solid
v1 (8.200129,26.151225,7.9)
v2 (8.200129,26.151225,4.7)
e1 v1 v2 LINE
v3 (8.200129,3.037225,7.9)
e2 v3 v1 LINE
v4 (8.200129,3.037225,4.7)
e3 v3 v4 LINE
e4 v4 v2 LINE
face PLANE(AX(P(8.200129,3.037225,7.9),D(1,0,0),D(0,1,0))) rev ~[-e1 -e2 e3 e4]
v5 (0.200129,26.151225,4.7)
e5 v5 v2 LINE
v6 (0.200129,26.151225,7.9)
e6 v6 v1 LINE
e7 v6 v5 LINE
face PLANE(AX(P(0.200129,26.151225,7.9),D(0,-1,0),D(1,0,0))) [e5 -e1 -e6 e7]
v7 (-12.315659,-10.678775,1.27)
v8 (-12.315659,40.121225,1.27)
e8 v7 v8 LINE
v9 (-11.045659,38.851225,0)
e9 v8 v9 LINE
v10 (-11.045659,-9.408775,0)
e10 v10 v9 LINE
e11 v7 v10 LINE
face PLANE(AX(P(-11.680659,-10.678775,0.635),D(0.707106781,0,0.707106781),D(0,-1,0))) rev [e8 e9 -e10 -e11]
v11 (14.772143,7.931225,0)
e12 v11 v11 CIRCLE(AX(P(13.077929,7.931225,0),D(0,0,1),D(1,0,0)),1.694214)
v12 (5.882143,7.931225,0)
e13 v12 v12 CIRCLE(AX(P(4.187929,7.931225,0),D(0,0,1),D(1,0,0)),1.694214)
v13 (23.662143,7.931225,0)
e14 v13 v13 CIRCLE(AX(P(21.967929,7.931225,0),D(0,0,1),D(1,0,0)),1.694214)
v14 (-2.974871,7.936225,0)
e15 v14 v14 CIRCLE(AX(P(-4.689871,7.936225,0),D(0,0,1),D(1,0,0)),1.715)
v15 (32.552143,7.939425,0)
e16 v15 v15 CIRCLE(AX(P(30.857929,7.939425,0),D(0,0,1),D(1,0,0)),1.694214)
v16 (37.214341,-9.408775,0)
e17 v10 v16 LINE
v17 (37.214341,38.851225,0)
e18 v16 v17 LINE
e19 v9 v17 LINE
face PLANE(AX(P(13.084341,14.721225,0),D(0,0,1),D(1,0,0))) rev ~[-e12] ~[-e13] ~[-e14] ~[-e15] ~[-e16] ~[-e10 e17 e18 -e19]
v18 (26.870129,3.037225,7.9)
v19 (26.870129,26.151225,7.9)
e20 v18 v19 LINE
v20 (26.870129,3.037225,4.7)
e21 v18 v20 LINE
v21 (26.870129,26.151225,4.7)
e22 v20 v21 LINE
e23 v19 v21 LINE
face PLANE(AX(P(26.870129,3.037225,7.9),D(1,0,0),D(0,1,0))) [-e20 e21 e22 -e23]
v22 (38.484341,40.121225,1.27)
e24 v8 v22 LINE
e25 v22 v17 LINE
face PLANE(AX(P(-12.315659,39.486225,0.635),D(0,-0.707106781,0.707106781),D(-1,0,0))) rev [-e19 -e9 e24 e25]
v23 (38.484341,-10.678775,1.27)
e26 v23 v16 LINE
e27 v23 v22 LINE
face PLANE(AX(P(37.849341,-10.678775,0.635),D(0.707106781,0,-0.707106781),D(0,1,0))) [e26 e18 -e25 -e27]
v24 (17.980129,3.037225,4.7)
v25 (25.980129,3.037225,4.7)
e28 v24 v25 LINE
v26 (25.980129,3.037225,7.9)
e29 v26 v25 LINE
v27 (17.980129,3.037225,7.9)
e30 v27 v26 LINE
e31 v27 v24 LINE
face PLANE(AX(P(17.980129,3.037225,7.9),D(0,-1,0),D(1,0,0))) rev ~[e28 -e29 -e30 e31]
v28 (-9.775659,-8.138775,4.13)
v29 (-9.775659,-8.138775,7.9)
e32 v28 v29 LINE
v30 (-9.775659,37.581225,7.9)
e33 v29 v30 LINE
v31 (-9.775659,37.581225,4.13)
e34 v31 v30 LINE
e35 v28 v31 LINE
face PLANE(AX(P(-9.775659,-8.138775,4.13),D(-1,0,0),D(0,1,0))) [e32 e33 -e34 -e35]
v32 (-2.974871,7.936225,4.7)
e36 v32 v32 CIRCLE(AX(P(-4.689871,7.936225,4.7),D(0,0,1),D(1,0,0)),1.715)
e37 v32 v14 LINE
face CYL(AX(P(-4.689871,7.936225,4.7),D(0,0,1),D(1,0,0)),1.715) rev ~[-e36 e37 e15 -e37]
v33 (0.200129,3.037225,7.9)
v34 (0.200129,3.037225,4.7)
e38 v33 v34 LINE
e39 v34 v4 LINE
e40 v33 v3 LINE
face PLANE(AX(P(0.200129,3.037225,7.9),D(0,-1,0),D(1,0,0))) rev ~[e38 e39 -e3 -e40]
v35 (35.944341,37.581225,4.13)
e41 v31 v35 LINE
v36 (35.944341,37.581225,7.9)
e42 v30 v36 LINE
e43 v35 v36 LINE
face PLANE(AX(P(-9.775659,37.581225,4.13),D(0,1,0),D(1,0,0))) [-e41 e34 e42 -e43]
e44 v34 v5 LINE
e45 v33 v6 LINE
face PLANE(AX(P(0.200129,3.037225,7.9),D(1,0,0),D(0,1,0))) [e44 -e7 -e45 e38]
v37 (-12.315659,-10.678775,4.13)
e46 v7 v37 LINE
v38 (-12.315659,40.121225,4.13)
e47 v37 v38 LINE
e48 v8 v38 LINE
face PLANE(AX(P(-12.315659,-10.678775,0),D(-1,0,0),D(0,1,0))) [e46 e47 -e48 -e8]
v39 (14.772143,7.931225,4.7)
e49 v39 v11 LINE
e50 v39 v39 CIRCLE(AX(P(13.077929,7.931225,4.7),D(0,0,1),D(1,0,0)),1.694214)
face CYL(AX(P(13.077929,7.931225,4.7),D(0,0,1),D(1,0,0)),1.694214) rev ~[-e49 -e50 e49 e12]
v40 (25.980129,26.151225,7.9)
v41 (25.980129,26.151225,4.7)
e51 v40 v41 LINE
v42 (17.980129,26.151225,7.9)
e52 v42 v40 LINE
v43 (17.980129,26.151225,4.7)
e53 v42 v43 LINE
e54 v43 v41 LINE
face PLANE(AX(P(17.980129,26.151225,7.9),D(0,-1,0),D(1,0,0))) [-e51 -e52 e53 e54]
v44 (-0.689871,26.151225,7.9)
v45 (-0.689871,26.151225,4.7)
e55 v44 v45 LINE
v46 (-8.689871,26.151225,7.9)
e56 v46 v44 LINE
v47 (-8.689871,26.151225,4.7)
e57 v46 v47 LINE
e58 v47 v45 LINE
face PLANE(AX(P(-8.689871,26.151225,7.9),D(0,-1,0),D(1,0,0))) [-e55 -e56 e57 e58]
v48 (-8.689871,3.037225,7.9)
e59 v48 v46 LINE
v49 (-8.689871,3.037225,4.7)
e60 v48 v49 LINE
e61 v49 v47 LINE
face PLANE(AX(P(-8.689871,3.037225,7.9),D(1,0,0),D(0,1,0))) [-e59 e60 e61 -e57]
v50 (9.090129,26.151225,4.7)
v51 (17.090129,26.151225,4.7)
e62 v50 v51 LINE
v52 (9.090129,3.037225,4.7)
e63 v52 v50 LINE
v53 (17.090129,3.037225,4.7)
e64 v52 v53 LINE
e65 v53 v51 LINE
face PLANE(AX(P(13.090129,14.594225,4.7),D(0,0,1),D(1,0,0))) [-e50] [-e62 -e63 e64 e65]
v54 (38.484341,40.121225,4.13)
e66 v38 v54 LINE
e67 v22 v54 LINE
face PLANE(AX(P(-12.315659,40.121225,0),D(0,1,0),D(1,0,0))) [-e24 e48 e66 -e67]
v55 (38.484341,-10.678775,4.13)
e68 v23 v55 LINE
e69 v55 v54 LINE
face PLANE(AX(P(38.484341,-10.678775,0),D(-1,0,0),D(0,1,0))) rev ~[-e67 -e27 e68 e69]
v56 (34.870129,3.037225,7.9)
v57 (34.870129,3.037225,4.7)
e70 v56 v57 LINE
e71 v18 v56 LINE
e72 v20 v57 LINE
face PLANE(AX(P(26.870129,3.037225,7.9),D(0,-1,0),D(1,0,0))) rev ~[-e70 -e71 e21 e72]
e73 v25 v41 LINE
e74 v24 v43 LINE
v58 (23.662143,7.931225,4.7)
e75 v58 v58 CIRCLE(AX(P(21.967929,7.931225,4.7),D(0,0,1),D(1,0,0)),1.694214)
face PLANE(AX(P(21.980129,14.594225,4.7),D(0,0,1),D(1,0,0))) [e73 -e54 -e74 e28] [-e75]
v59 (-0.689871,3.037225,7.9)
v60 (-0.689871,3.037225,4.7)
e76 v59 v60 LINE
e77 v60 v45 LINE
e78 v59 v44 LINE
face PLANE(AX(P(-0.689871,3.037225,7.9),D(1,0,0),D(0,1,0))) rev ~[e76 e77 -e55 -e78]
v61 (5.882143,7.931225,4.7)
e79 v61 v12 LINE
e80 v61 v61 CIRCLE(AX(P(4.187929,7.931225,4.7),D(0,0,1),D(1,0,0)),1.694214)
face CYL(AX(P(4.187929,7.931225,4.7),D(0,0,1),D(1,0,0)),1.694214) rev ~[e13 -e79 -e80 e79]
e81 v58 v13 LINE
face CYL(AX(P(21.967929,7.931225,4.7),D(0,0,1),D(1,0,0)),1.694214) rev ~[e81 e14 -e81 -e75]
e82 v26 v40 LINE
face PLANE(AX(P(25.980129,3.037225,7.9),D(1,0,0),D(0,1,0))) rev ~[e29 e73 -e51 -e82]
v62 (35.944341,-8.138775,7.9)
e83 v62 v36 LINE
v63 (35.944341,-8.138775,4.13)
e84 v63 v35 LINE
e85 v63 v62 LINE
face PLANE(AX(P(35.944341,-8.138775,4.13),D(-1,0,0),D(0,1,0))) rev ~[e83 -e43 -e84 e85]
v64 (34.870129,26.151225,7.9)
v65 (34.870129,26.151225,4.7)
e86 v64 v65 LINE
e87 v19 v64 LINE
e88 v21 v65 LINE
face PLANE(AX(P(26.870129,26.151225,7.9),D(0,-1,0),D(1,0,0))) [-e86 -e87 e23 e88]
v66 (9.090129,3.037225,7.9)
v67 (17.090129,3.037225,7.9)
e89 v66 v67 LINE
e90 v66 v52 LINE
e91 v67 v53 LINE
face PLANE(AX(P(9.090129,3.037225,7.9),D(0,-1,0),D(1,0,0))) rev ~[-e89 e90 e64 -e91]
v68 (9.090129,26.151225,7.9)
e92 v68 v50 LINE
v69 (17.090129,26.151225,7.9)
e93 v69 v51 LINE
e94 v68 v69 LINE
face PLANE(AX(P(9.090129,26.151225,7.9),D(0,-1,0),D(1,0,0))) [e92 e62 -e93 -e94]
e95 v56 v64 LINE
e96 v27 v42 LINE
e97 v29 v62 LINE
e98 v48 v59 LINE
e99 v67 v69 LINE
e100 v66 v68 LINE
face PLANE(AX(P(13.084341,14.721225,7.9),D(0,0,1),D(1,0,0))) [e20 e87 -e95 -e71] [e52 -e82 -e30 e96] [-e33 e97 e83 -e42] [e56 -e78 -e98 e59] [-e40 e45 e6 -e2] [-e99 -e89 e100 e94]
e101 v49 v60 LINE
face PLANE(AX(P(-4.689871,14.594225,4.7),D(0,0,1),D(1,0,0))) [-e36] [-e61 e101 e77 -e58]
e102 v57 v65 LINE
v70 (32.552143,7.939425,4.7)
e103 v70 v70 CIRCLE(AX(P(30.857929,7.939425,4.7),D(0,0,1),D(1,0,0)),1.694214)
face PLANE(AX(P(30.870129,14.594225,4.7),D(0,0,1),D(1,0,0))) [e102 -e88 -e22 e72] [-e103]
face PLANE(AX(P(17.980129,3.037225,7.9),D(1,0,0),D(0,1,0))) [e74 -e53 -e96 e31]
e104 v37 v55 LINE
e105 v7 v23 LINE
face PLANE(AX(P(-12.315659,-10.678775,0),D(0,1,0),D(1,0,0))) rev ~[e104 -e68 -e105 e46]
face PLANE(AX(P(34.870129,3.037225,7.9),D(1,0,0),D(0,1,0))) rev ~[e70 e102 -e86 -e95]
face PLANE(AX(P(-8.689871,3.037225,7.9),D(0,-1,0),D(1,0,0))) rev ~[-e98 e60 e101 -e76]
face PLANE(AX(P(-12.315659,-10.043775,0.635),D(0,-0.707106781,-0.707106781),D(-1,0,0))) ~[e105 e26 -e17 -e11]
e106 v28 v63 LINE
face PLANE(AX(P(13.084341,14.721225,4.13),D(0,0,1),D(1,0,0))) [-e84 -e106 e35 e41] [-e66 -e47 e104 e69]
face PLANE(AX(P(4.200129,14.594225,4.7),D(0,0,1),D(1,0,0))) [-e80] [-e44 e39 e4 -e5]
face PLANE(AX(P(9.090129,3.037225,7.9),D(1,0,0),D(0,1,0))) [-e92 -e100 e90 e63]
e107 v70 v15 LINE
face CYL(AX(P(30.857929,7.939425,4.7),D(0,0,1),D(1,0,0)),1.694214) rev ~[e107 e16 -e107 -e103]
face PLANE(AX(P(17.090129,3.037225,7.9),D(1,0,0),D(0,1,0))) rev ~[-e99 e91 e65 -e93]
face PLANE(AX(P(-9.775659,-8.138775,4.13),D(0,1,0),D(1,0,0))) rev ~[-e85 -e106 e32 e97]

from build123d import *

# Parameters (mm, degrees)
F0_W      = 50.8
F0_H      = 50.8
F1_DEPTH  = 4.13
F3_W      = 45.72
F3_H      = 45.72
F4_DEPTH  = 3.77
F5_W      = 8
F5_H      = 23.114
F6_DEPTH  = 3.2
F7_R      = 1.715
F8_DEPTH  = 25.4
F9_SIZE   = 1.27
F10_R     = 1.694213851
F11_DEPTH = 25.4


# Not quite as in the source:
# - a feature names something its author has since deleted; it is built from what else it names


with BuildPart() as f1:
    # F0 (on Top) → F1 (new body)
    with BuildSketch(Plane.XY):
        with Locations((13.0843408406, 14.7212249442)):
            Rectangle(F0_W, F0_H)
    extrude(amount=F1_DEPTH)

    # F3 (on face) → F4 (join)
    with BuildSketch(Plane.XY.offset(4.13)):
        with Locations((13.0843408406, 14.7212249442)):
            Rectangle(F3_W, F3_H)
    extrude(amount=F4_DEPTH)

    # F5 (on face) → F6 (cut)
    with BuildSketch(Plane.XY.offset(7.9)):
        with Locations((4.2001288666, 14.5942249442)):
            Rectangle(F5_W, F5_H)
        with Locations((13.0901288666, 14.5942249442)):
            Rectangle(F5_W, F5_H)
        with Locations((21.9801288666, 14.5942249442)):
            Rectangle(F5_W, F5_H)
        with Locations((30.8701288666, 14.5942249442)):
            Rectangle(F5_W, F5_H)
        with Locations((-4.6898711334, 14.5942249442)):
            Rectangle(F5_W, F5_H)
    extrude(amount=-F6_DEPTH, mode=Mode.SUBTRACT)

    # F7 (on face) → F8 (cut)
    with BuildSketch(Plane.XY.offset(4.7)):
        with Locations((-4.6898711334, 7.9362249442)):
            Circle(F7_R)
    extrude(amount=-F8_DEPTH, mode=Mode.SUBTRACT)

    # F9
    f9_edges = [f1.edges().sort_by_distance(p)[0] for p in [
        (13.084341, -10.678775, 0),
        (13.084341, 40.121225, 0),
        (-12.315659, 14.721225, 0),
        (38.484341, 14.721225, 0),
    ]]
    chamfer(f9_edges, length=F9_SIZE)

    # F10 (on face) → F11 (cut)
    with BuildSketch(Plane.XY.offset(4.7)):
        with Locations((4.1879288666, 7.9312249442)):
            Circle(F10_R)
        with Locations((13.0779288666, 7.9312249442)):
            Circle(F10_R)
        with Locations((21.9679288666, 7.9312249442)):
            Circle(F10_R)
        with Locations((30.8579288666, 7.9394249442)):
            Circle(F10_R)
    extrude(amount=-F11_DEPTH, mode=Mode.SUBTRACT)


solid = f1.part
